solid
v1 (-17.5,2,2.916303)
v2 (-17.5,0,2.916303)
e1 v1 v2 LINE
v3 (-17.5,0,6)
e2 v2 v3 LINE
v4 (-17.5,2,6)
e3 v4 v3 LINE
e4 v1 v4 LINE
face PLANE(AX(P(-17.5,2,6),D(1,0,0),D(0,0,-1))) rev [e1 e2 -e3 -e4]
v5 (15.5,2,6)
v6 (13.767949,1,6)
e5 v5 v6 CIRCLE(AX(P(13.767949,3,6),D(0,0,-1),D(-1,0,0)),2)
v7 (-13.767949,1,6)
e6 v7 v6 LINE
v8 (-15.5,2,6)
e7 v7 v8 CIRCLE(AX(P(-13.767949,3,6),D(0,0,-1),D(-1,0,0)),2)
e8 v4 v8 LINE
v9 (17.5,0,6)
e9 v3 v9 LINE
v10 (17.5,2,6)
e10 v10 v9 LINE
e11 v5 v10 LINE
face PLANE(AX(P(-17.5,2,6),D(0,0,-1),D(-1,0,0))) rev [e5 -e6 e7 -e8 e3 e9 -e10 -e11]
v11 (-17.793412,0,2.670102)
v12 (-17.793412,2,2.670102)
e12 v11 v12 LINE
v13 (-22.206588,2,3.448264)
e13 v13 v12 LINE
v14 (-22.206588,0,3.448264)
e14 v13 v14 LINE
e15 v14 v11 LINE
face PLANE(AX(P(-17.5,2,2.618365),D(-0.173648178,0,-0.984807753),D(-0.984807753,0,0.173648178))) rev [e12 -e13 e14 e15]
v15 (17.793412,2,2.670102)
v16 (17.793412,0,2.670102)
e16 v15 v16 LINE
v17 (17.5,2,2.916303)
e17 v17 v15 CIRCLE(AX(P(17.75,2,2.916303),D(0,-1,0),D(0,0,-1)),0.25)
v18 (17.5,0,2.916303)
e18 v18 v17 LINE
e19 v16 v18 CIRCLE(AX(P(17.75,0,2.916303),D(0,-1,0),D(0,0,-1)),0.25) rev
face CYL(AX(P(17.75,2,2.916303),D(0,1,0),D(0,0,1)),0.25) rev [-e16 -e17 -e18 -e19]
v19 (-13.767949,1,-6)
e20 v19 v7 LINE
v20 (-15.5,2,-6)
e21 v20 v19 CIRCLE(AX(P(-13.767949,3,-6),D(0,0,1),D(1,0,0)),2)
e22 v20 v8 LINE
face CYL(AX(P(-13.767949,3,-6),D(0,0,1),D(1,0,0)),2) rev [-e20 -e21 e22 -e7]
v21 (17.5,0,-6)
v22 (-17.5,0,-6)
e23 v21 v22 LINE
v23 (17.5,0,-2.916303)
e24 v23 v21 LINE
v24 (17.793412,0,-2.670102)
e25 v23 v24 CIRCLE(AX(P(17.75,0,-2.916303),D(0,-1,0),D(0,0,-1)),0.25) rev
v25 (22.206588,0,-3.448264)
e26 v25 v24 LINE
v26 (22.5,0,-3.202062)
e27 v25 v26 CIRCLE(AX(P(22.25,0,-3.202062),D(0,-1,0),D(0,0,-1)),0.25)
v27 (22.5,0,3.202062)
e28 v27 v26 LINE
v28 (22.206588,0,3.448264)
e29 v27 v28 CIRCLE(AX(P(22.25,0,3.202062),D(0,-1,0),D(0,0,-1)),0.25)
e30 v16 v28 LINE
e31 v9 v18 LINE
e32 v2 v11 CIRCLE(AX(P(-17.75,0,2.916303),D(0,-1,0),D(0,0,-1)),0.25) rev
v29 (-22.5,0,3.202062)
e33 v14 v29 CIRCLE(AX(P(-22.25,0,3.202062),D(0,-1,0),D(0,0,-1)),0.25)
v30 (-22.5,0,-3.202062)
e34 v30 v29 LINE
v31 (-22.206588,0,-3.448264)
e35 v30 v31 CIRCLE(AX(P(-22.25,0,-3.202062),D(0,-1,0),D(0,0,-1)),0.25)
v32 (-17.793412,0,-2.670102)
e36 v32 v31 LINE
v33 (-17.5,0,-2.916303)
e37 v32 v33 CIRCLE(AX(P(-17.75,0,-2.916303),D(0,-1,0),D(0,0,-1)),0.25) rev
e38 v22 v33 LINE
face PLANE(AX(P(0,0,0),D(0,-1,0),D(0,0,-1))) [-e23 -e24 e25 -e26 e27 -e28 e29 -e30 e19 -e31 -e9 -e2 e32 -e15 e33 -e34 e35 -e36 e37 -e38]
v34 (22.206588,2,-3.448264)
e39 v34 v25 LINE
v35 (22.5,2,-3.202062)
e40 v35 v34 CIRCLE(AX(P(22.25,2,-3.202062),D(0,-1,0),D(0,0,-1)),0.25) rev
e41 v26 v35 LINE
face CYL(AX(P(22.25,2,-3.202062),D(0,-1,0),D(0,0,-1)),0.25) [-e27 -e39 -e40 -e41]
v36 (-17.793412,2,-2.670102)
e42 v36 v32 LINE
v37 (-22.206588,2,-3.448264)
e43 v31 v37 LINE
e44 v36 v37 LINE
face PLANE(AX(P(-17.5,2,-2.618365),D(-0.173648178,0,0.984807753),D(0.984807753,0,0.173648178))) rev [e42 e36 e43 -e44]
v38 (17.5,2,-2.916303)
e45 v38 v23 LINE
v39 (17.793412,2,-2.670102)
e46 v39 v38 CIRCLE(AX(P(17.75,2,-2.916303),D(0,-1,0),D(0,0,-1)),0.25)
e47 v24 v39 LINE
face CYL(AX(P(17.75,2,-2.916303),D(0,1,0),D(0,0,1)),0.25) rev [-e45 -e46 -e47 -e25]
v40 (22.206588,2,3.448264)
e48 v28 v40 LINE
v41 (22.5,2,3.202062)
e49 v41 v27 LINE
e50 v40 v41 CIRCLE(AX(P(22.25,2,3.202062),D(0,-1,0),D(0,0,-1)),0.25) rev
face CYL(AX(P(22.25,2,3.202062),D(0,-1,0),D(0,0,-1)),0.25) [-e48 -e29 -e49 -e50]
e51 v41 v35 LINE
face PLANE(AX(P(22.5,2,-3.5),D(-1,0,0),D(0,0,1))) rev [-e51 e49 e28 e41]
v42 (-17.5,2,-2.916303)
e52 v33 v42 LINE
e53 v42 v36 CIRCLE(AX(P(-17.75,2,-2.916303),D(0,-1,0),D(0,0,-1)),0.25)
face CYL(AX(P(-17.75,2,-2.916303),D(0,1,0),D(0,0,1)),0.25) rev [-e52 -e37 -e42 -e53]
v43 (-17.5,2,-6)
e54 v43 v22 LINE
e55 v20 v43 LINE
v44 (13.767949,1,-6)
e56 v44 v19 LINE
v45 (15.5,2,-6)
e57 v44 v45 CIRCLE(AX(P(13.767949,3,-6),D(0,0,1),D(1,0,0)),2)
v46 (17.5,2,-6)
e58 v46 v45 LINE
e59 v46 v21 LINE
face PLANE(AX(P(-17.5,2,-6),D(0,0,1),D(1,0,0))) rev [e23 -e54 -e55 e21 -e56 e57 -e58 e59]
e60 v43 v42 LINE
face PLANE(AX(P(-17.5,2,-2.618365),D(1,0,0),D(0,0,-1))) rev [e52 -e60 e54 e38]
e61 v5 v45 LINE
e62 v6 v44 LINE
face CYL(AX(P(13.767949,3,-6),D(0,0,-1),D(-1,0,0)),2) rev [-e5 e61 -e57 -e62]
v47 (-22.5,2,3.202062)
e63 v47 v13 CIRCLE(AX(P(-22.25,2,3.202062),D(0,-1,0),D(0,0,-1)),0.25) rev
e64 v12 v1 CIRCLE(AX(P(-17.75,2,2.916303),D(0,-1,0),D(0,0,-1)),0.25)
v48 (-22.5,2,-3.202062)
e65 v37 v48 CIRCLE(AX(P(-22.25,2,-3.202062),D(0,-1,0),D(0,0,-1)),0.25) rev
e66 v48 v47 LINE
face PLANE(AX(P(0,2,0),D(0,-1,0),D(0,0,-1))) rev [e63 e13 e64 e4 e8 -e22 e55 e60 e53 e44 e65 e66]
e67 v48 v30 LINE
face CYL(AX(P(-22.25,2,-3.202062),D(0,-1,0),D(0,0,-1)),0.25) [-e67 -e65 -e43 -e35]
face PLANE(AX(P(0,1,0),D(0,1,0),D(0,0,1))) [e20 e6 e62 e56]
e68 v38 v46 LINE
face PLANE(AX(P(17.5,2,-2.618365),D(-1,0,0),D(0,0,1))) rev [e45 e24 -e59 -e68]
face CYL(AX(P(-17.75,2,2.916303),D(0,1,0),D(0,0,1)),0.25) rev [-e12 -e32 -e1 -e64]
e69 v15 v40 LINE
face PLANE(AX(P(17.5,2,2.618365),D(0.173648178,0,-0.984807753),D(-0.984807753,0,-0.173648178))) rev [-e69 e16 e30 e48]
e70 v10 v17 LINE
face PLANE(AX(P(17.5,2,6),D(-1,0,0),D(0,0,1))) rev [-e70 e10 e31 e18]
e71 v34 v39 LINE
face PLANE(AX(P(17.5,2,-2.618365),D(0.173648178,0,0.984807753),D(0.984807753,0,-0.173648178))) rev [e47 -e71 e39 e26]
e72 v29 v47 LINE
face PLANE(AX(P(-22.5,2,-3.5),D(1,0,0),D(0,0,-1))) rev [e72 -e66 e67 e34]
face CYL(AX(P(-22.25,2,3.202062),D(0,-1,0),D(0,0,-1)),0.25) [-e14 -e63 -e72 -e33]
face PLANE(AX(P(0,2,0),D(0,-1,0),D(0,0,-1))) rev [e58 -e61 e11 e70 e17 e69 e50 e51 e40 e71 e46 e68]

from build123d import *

# Parameters (mm, degrees)
BOSS_EXTRUDE1_DEPTH = 2
FILLET1_R           = 0.25
SKETCH3_W           = 31
SKETCH3_H           = 12
CUT_EXTRUDE2_DEPTH  = 1
FILLET6_R           = 2


with BuildPart() as part:
    # Sketch1 → Boss-Extrude1 (new body)
    with BuildSketch(Plane(origin=(0, 0, 0), x_dir=(1, 0, 0), z_dir=(0, 1, 0))):
        Polygon((-17.5, 2.618365096), (-22.5, 3.5), (-22.5, -3.5), (-17.5, -2.618365096), (-17.5, -6), (17.5, -6), (17.5, -2.618365096), (22.5, -3.5), (22.5, 3.5), (17.5, 2.618365096), (17.5, 6), (-17.5, 6), align=None)
    extrude(amount=BOSS_EXTRUDE1_DEPTH)

    # Fillet1
    fillet1_edges = [part.edges().sort_by_distance(p)[0] for p in [
        (17.5, 1, -2.618365096),
        (22.5, 1, -3.5),
        (22.5, 1, 3.5),
        (17.5, 1, 2.618365096),
        (-17.5, 1, 2.618365096),
        (-22.5, 1, 3.5),
        (-22.5, 1, -3.5),
        (-17.5, 1, -2.618365096),
    ]]
    fillet(fillet1_edges, radius=FILLET1_R)

    # Sketch3 → Cut-Extrude2 (cut)
    with BuildSketch(Plane(origin=(0, 2, 0), x_dir=(1, 0, 0), z_dir=(0, 1, 0))):
        Rectangle(SKETCH3_W, SKETCH3_H)
    extrude(amount=-CUT_EXTRUDE2_DEPTH, mode=Mode.SUBTRACT)

    # Fillet6
    # the kernel refuses this fillet: 2 mm, written as the material it adds along each edge
    with BuildSketch(Plane(origin=(-15.5, 1, 6), x_dir=(0, 1, 0), z_dir=(0, 0, -1))) as fillet6_piece_1:
        with BuildLine():
            CenterArc((2, 1.732050808), FILLET6_R, 180, 60)
            Line((0, 1.732050808), (-0.04, 1.732050808))
            Line((-0.04, 1.732050808), (-0.04, 0))
            Line((-0.04, 0), (0, -0.04))
            ThreePointArc((0, -0.04), (0.5, -0.04), (0.98, -0.034641016))
            Line((0.98, -0.034641016), (1, 0))
        make_face()
    extrude(amount=12)
    with BuildSketch(Plane(origin=(15.5, 1, -6), x_dir=(-1, 0, 0), z_dir=(0, 0, 1))) as fillet6_piece_2:
        with BuildLine():
            CenterArc((1.732050808, -2), FILLET6_R, 90, 60)
            Line((0, -1), (-0.034641016, -0.98))
            ThreePointArc((-0.034641016, -0.98), (-0.04, -0.5), (-0.04, 0))
            Line((-0.04, 0), (0, 0.04))
            Line((0, 0.04), (1.732050808, 0.04))
            Line((1.732050808, 0.04), (1.732050808, 0))
        make_face()
    extrude(amount=12)


solid = part.part
